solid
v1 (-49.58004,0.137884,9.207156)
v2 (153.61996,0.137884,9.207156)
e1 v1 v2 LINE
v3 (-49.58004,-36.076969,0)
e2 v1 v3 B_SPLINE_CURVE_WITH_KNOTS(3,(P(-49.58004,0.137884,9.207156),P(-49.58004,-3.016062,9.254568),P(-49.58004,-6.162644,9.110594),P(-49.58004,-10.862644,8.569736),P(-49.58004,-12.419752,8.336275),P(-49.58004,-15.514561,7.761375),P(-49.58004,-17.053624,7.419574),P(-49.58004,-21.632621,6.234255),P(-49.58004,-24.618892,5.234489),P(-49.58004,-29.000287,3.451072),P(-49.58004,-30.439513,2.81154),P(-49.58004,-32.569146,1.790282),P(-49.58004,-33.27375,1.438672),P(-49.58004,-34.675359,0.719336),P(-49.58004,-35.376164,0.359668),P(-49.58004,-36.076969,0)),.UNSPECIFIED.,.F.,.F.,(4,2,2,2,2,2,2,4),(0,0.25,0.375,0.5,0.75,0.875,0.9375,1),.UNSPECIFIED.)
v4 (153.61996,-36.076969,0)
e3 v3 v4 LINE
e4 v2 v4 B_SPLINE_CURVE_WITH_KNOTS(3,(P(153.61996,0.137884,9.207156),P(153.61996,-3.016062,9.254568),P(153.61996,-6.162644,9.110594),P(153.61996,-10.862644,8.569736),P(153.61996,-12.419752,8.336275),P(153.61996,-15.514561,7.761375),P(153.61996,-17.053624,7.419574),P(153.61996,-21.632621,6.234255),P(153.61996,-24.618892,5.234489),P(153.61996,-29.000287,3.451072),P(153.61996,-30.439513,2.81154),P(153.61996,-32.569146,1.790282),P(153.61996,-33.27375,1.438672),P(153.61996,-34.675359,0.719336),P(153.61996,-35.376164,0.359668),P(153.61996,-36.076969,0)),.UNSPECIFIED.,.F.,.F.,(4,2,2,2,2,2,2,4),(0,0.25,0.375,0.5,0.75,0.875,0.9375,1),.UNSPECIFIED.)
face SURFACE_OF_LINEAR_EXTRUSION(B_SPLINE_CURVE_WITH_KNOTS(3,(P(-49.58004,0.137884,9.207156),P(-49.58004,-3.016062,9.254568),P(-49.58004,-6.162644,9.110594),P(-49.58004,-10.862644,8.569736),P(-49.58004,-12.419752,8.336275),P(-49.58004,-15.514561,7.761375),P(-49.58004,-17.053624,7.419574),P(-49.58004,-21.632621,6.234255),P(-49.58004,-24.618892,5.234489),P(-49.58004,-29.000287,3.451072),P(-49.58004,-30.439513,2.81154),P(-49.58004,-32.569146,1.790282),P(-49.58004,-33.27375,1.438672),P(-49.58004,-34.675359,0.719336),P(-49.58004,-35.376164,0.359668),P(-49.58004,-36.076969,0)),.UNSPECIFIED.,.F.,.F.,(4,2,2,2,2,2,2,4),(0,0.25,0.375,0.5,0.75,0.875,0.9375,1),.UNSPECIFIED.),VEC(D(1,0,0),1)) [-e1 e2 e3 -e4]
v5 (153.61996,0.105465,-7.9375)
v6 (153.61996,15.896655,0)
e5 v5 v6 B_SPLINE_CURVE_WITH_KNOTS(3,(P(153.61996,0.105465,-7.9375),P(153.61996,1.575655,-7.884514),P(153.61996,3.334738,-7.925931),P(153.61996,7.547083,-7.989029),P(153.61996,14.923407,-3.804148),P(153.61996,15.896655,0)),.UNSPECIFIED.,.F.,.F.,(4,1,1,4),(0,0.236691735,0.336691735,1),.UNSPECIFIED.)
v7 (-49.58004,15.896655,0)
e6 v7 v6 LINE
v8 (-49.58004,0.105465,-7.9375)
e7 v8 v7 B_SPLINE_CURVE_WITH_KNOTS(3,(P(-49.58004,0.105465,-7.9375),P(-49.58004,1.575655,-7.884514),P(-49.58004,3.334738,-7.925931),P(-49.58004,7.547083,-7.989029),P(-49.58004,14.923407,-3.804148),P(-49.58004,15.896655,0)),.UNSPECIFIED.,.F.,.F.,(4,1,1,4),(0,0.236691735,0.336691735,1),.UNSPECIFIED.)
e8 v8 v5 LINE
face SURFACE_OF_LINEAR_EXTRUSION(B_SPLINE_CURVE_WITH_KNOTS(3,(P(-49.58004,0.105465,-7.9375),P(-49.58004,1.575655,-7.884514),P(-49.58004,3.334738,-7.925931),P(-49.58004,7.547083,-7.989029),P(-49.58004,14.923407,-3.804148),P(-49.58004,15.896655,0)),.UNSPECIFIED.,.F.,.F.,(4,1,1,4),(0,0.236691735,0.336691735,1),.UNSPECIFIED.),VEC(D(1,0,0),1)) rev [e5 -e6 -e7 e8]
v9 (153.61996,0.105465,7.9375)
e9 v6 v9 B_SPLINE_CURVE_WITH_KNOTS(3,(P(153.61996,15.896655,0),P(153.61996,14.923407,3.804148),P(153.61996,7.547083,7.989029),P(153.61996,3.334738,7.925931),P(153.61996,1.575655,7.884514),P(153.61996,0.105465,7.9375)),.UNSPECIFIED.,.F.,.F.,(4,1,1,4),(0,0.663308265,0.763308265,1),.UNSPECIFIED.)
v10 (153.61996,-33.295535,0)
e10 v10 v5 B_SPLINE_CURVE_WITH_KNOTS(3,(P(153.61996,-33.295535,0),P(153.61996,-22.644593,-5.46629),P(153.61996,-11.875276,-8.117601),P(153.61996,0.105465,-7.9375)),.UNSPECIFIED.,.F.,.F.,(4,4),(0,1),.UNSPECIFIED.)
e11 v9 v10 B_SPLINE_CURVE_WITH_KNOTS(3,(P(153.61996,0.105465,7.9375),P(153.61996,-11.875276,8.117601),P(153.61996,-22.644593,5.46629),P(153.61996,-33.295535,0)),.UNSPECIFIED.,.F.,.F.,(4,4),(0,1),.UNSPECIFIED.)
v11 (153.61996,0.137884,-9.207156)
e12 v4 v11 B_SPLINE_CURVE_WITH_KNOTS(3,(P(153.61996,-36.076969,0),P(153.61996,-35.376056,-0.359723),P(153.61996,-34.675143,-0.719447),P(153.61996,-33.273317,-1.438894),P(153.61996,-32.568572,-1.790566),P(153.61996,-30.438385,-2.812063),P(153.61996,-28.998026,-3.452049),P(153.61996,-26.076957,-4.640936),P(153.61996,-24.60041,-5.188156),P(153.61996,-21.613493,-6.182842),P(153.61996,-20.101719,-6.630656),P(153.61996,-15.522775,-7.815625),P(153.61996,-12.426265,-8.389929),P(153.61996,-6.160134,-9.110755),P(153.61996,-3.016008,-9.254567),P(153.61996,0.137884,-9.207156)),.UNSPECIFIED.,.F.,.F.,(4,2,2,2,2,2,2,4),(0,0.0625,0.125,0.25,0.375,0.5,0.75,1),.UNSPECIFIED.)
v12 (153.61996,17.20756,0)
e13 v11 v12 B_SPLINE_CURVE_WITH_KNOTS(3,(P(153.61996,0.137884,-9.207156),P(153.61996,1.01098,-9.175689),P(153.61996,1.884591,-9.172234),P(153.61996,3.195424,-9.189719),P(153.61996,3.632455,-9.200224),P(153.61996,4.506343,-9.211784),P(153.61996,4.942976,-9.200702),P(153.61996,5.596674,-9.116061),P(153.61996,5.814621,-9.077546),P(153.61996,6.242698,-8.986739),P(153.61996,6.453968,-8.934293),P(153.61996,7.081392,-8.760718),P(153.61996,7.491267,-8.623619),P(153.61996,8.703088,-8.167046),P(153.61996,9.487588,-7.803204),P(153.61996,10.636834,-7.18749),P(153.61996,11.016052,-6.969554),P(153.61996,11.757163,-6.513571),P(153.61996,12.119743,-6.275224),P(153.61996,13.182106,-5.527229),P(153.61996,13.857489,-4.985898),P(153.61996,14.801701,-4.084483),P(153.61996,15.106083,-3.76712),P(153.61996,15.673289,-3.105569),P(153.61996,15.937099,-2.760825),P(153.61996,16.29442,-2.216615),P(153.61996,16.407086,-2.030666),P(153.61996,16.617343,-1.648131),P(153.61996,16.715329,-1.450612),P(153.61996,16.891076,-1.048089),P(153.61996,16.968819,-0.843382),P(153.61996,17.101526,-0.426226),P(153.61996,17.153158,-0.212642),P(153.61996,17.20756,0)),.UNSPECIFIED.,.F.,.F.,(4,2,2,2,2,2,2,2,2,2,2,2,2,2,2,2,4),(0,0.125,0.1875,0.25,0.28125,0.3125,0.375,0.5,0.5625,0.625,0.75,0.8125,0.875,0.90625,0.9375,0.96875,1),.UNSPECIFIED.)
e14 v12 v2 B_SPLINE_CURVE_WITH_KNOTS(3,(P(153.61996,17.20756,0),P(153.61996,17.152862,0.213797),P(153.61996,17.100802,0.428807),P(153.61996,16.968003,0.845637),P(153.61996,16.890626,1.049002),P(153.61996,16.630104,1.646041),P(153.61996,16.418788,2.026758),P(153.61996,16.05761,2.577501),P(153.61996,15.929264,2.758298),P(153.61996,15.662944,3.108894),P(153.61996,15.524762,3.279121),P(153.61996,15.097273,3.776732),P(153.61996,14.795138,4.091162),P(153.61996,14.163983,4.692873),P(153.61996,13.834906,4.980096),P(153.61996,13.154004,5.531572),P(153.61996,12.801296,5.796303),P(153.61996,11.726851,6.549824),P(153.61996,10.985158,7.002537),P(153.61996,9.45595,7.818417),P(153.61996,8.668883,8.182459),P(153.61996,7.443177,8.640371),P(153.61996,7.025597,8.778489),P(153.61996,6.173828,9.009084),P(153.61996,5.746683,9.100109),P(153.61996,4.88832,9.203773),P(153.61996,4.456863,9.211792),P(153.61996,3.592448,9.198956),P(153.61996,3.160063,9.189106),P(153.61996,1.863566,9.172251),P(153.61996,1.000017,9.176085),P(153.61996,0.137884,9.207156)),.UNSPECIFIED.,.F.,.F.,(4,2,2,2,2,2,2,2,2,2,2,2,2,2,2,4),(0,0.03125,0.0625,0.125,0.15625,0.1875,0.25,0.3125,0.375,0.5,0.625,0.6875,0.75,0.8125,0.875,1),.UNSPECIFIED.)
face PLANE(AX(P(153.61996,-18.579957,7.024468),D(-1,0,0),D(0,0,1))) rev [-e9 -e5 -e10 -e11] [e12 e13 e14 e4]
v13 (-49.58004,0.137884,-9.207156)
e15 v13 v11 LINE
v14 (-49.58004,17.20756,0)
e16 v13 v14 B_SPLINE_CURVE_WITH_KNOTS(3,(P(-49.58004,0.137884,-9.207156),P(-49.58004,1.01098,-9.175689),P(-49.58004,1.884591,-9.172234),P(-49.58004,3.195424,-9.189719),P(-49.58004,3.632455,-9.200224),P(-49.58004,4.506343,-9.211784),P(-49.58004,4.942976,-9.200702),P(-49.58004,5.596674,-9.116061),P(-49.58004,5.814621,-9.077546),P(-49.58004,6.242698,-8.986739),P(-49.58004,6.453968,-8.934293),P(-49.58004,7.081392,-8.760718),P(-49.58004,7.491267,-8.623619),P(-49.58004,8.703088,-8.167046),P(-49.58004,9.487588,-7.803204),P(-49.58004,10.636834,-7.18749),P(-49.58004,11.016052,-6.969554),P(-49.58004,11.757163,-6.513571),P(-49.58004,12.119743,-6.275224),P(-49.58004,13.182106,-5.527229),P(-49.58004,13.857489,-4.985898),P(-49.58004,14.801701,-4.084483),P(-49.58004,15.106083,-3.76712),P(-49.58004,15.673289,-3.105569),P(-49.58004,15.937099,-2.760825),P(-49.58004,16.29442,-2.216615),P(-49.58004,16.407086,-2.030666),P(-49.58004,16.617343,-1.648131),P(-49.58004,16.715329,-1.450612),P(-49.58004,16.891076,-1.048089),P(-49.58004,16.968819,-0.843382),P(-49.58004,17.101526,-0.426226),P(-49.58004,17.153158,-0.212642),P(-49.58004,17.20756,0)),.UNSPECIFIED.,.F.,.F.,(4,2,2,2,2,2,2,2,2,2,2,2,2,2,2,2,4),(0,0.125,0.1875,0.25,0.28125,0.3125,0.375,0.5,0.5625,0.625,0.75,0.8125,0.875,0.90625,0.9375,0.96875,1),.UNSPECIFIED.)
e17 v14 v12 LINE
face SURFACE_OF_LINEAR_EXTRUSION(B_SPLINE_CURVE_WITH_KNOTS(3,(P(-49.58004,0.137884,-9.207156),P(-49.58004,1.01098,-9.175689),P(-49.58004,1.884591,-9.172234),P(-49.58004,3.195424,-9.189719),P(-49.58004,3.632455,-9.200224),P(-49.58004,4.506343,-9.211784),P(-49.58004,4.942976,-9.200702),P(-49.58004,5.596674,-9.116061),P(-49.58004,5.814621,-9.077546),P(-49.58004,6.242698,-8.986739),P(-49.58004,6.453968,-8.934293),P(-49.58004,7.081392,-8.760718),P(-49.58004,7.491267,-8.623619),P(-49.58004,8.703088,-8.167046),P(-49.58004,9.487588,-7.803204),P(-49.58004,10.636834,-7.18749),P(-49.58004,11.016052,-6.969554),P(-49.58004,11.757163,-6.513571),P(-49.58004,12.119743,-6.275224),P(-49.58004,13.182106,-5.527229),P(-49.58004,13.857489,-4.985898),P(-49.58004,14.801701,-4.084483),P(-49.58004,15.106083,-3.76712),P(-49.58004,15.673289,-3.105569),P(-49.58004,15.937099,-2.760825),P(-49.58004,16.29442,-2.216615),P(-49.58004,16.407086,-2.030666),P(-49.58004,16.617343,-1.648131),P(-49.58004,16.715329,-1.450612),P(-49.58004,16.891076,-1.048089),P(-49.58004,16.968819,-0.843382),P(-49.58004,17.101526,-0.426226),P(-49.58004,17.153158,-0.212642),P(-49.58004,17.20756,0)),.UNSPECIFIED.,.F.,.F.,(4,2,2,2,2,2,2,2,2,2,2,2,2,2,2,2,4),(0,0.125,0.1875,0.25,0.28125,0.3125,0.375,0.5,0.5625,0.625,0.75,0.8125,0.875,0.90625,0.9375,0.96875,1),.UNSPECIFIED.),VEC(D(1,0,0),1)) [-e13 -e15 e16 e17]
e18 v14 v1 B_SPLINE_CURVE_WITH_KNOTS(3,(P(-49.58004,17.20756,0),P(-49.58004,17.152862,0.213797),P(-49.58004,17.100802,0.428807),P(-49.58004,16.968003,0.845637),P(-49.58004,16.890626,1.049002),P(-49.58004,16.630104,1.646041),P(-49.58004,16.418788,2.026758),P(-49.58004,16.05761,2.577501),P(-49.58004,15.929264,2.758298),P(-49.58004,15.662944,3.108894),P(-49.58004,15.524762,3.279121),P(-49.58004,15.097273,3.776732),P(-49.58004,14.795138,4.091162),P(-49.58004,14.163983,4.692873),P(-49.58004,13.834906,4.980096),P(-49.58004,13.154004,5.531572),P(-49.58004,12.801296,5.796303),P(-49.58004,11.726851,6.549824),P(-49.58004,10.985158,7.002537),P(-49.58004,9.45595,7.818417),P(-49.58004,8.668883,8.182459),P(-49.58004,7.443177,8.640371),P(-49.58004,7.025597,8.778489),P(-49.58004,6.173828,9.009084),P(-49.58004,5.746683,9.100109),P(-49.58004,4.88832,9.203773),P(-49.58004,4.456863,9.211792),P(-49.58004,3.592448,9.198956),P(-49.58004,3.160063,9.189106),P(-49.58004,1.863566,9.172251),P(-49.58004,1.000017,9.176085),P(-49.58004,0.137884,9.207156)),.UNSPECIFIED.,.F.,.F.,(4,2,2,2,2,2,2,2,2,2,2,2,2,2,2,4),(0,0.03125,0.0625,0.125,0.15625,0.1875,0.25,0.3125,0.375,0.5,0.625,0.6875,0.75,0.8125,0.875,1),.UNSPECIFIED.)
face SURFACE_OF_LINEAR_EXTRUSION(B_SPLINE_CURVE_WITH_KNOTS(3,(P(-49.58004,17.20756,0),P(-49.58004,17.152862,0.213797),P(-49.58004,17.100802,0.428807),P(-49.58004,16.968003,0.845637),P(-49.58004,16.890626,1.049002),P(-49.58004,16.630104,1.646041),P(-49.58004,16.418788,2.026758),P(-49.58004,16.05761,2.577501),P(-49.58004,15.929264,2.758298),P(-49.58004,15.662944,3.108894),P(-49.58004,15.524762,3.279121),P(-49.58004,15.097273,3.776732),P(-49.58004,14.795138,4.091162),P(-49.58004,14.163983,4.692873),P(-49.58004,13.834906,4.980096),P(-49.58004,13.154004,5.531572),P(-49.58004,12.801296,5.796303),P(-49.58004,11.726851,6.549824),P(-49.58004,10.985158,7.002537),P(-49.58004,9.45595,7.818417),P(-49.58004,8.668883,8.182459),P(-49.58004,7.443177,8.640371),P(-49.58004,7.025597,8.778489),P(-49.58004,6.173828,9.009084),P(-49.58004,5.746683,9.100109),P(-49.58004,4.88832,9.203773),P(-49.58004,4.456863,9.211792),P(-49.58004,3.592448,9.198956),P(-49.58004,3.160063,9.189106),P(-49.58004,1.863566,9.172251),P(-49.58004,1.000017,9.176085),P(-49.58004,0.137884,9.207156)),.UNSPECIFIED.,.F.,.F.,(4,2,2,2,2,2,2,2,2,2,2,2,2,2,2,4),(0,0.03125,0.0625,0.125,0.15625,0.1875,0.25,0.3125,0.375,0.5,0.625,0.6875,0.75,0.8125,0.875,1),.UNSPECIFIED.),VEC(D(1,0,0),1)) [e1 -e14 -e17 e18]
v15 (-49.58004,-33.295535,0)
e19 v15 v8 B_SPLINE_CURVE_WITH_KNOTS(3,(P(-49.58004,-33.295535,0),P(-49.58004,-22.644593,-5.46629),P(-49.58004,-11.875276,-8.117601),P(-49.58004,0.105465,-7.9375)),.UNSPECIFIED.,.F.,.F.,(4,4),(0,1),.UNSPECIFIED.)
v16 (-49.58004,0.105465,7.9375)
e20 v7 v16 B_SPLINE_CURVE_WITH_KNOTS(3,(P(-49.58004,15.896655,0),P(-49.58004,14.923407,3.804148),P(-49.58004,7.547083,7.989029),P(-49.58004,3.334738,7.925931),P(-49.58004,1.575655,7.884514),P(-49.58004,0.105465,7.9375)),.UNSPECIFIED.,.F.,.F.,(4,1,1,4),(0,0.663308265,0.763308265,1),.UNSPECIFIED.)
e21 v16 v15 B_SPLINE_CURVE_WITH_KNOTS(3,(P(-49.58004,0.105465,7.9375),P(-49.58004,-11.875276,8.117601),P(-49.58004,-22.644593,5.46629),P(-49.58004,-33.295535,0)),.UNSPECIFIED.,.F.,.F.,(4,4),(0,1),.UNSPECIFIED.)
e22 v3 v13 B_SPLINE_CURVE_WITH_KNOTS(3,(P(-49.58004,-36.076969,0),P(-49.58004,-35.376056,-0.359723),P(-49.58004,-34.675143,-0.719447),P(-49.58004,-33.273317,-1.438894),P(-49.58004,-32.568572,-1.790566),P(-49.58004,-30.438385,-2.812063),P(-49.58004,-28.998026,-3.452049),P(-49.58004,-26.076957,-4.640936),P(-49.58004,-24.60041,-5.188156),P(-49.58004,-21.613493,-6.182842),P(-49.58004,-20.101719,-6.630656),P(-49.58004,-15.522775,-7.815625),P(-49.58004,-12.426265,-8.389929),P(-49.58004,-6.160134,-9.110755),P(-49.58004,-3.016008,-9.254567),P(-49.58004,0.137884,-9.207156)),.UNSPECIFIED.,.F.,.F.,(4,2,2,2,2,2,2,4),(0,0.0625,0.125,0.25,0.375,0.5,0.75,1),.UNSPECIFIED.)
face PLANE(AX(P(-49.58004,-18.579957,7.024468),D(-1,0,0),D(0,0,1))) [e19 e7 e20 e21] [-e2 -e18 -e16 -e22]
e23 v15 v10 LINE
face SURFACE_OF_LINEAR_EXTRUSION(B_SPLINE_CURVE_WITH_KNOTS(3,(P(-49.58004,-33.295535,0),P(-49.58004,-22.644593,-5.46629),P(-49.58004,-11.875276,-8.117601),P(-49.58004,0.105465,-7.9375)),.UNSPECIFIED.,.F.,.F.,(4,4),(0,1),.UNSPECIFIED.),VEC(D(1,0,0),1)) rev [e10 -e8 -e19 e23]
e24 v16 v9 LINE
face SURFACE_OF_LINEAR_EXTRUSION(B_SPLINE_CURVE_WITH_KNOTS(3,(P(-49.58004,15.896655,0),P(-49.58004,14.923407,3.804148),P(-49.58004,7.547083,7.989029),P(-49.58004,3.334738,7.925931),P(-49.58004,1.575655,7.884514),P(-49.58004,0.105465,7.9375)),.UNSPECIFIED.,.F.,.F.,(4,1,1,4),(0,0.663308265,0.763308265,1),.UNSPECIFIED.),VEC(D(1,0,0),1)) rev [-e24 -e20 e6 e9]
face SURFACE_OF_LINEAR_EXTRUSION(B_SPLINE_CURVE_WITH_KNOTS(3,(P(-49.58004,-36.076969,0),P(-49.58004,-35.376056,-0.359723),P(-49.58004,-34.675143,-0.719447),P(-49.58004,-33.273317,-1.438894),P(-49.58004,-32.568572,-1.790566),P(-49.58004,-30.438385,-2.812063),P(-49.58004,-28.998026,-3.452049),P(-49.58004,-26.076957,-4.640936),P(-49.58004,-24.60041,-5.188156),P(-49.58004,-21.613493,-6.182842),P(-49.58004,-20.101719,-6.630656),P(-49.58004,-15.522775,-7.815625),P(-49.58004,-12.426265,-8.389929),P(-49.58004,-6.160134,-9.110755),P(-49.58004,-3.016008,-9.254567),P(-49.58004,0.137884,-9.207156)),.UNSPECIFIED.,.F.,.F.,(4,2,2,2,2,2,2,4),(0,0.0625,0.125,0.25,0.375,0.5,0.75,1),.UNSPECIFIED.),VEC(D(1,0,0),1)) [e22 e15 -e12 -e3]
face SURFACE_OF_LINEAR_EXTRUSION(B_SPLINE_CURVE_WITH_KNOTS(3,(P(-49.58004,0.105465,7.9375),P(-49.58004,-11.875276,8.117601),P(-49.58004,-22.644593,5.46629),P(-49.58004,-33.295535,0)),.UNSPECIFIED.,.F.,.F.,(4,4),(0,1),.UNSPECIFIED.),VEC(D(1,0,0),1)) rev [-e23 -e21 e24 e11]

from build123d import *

# Parameters (mm, degrees)
BOSS_EXTRUDE1_DEPTH      = 153.61996
BOSS_EXTRUDE1_DEPTH_BACK = 104.21574
SKETCH1_R                = 7.9375
SKETCH1_R_2              = 6.4643
EXTRUDE_THIN1_START      = -203.2
EXTRUDE_THIN1_DEPTH      = 203.2


# Read off the part's stored shape, not the designer's step: Extrude-Thin1
with BuildPart() as part:
    # Sketch1 → Boss-Extrude1 (new, two sides: drawn at the far end of the back side and taken through both)
    with BuildSketch(Plane(origin=(0, 0, 0), x_dir=(0, 0, -1), z_dir=(1, 0, 0)).offset(-BOSS_EXTRUDE1_DEPTH_BACK)):
        with Locations(Location((0, 0, 0), (0, 0, 270))):
            Circle(SKETCH1_R)
        with Locations(Location((0, 0, 0), (0, 0, 270))):
            Circle(SKETCH1_R_2, mode=Mode.SUBTRACT)
    extrude(amount=BOSS_EXTRUDE1_DEPTH + BOSS_EXTRUDE1_DEPTH_BACK)


with BuildPart() as body_2:
    # Extrude-Thin1 outline → Extrude-Thin1 (new body)
    with BuildSketch(Plane(origin=(153.619959862, 0, 0), x_dir=(0, 0, -1), z_dir=(1, 0, 0)).offset(EXTRUDE_THIN1_START)):
        with BuildLine():
            add(Edge.make_bspline(
                [(0, 17.207559546), (-0.213797016, 17.152862004), (-0.42880706, 17.100801803), (-0.845636753, 16.968003101), (-1.049002351, 16.890625775), (-1.646041309, 16.630103699), (-2.026757553, 16.418787844), (-2.577500677, 16.057610271), (-2.758298236, 15.929264249), (-3.108894312, 15.662943804), (-3.279121061, 15.524761589), (-3.776732023, 15.097272706), (-4.091162254, 14.795137978), (-4.692872976, 14.163982702), (-4.980096404, 13.834905644), (-5.531572182, 13.154003751), (-5.79630298, 12.801295822), (-6.549823619, 11.726851467), (-7.002537116, 10.985157901), (-7.81841744, 9.455950062), (-8.182458905, 8.668883339), (-8.640371405, 7.443177376), (-8.778488758, 7.025596822), (-9.009083778, 6.173827929), (-9.100109427, 5.746682632), (-9.20377314, 4.888320037), (-9.211792234, 4.456862798), (-9.198956322, 3.592448397), (-9.189105956, 3.160062893), (-9.172251023, 1.863565908), (-9.176084553, 1.000017435), (-9.207156149, 0.137883897)],
                knots=[0, 0, 0, 0, 0.03125, 0.03125, 0.0625, 0.0625, 0.125, 0.125, 0.15625, 0.15625, 0.1875, 0.1875, 0.25, 0.25, 0.3125, 0.3125, 0.375, 0.375, 0.5, 0.5, 0.625, 0.625, 0.6875, 0.6875, 0.75, 0.75, 0.8125, 0.8125, 0.875, 0.875, 1, 1, 1, 1], degree=3))
            add(Edge.make_bspline(
                [(-9.207156149, 0.137883897), (-9.254567879, -3.016061968), (-9.110594057, -6.162643619), (-8.569736414, -10.862643519), (-8.336275013, -12.419752076), (-7.761375356, -15.514560805), (-7.419573925, -17.053624435), (-6.234254823, -21.632621497), (-5.234488958, -24.618892113), (-3.451071682, -29.000286622), (-2.811540258, -30.439512737), (-1.79028171, -32.569146175), (-1.438672145, -33.273749518), (-0.719336072, -34.675359425), (-0.359668036, -35.376164378), (0, -36.076969332)],
                knots=[0, 0, 0, 0, 0.25, 0.25, 0.375, 0.375, 0.5, 0.5, 0.75, 0.75, 0.875, 0.875, 0.9375, 0.9375, 1, 1, 1, 1], degree=3))
            add(Edge.make_bspline(
                [(0, -36.076969332), (0.359723472, -35.376056363), (0.719446944, -34.675143394), (1.438893888, -33.273317456), (1.790565857, -32.568572444), (2.812063227, -30.438384557), (3.452048995, -28.998025839), (4.640936279, -26.076956924), (5.18815569, -24.600410118), (6.182841679, -21.613493253), (6.630656344, -20.101718647), (7.815624895, -15.522775449), (8.389928975, -12.426265441), (9.11075463, -6.160134365), (9.254567065, -3.016007792), (9.207156149, 0.137883897)],
                knots=[0, 0, 0, 0, 0.0625, 0.0625, 0.125, 0.125, 0.25, 0.25, 0.375, 0.375, 0.5, 0.5, 0.75, 0.75, 1, 1, 1, 1], degree=3))
            add(Edge.make_bspline(
                [(9.207156149, 0.137883897), (9.175689476, 1.0109795), (9.172233827, 1.884590619), (9.189718729, 3.195424485), (9.200223759, 3.632455178), (9.211783508, 4.50634264), (9.200702397, 4.942976061), (9.116060671, 5.596674351), (9.077545633, 5.814621094), (8.98673913, 6.242698466), (8.934293247, 6.453967929), (8.760718275, 7.081391667), (8.623619453, 7.491266508), (8.167045839, 8.703087673), (7.803203601, 9.487588343), (7.187490205, 10.636834402), (6.969553739, 11.016052248), (6.513571235, 11.757163338), (6.275223658, 12.119743306), (5.527228859, 13.18210628), (4.98589787, 13.857489095), (4.084483233, 14.801700924), (3.767120438, 15.10608301), (3.105568901, 15.673289405), (2.760825125, 15.937099293), (2.216615083, 16.294420145), (2.030666021, 16.407085609), (1.648130786, 16.617343262), (1.450611941, 16.715328905), (1.048088593, 16.891075907), (0.843382437, 16.968818509), (0.426225712, 17.101525866), (0.212641899, 17.153157527), (0, 17.207559546)],
                knots=[0, 0, 0, 0, 0.125, 0.125, 0.1875, 0.1875, 0.25, 0.25, 0.28125, 0.28125, 0.3125, 0.3125, 0.375, 0.375, 0.5, 0.5, 0.5625, 0.5625, 0.625, 0.625, 0.75, 0.75, 0.8125, 0.8125, 0.875, 0.875, 0.90625, 0.90625, 0.9375, 0.9375, 0.96875, 0.96875, 1, 1, 1, 1], degree=3))
        make_face()
        with BuildLine():
            add(Edge.make_bspline(
                [(-7.9375, 0.105464983), (-8.117600633, -11.875275839), (-5.466290217, -22.644593383), (0, -33.295535017)],
                knots=[0, 0, 0, 0, 1, 1, 1, 1], degree=3))
            add(Edge.make_bspline(
                [(0, 15.896655346), (-3.804147623, 14.923407312), (-7.989029069, 7.547083002), (-7.925930538, 3.33473819), (-7.884513847, 1.575654615), (-7.9375, 0.105464983)],
                knots=[0, 0, 0, 0, 0.663308265, 0.763308265, 1, 1, 1, 1], degree=3))
            add(Edge.make_bspline(
                [(7.9375, 0.105464983), (7.884513847, 1.575654615), (7.925930538, 3.33473819), (7.989029069, 7.547083002), (3.804147623, 14.923407312), (0, 15.896655346)],
                knots=[0, 0, 0, 0, 0.236691735, 0.336691735, 1, 1, 1, 1], degree=3))
            add(Edge.make_bspline(
                [(0, -33.295535017), (5.466290217, -22.644593383), (8.117600633, -11.875275839), (7.9375, 0.105464983)],
                knots=[0, 0, 0, 0, 1, 1, 1, 1], degree=3))
        make_face(mode=Mode.SUBTRACT)
    extrude(amount=EXTRUDE_THIN1_DEPTH)


solid = body_2.part
